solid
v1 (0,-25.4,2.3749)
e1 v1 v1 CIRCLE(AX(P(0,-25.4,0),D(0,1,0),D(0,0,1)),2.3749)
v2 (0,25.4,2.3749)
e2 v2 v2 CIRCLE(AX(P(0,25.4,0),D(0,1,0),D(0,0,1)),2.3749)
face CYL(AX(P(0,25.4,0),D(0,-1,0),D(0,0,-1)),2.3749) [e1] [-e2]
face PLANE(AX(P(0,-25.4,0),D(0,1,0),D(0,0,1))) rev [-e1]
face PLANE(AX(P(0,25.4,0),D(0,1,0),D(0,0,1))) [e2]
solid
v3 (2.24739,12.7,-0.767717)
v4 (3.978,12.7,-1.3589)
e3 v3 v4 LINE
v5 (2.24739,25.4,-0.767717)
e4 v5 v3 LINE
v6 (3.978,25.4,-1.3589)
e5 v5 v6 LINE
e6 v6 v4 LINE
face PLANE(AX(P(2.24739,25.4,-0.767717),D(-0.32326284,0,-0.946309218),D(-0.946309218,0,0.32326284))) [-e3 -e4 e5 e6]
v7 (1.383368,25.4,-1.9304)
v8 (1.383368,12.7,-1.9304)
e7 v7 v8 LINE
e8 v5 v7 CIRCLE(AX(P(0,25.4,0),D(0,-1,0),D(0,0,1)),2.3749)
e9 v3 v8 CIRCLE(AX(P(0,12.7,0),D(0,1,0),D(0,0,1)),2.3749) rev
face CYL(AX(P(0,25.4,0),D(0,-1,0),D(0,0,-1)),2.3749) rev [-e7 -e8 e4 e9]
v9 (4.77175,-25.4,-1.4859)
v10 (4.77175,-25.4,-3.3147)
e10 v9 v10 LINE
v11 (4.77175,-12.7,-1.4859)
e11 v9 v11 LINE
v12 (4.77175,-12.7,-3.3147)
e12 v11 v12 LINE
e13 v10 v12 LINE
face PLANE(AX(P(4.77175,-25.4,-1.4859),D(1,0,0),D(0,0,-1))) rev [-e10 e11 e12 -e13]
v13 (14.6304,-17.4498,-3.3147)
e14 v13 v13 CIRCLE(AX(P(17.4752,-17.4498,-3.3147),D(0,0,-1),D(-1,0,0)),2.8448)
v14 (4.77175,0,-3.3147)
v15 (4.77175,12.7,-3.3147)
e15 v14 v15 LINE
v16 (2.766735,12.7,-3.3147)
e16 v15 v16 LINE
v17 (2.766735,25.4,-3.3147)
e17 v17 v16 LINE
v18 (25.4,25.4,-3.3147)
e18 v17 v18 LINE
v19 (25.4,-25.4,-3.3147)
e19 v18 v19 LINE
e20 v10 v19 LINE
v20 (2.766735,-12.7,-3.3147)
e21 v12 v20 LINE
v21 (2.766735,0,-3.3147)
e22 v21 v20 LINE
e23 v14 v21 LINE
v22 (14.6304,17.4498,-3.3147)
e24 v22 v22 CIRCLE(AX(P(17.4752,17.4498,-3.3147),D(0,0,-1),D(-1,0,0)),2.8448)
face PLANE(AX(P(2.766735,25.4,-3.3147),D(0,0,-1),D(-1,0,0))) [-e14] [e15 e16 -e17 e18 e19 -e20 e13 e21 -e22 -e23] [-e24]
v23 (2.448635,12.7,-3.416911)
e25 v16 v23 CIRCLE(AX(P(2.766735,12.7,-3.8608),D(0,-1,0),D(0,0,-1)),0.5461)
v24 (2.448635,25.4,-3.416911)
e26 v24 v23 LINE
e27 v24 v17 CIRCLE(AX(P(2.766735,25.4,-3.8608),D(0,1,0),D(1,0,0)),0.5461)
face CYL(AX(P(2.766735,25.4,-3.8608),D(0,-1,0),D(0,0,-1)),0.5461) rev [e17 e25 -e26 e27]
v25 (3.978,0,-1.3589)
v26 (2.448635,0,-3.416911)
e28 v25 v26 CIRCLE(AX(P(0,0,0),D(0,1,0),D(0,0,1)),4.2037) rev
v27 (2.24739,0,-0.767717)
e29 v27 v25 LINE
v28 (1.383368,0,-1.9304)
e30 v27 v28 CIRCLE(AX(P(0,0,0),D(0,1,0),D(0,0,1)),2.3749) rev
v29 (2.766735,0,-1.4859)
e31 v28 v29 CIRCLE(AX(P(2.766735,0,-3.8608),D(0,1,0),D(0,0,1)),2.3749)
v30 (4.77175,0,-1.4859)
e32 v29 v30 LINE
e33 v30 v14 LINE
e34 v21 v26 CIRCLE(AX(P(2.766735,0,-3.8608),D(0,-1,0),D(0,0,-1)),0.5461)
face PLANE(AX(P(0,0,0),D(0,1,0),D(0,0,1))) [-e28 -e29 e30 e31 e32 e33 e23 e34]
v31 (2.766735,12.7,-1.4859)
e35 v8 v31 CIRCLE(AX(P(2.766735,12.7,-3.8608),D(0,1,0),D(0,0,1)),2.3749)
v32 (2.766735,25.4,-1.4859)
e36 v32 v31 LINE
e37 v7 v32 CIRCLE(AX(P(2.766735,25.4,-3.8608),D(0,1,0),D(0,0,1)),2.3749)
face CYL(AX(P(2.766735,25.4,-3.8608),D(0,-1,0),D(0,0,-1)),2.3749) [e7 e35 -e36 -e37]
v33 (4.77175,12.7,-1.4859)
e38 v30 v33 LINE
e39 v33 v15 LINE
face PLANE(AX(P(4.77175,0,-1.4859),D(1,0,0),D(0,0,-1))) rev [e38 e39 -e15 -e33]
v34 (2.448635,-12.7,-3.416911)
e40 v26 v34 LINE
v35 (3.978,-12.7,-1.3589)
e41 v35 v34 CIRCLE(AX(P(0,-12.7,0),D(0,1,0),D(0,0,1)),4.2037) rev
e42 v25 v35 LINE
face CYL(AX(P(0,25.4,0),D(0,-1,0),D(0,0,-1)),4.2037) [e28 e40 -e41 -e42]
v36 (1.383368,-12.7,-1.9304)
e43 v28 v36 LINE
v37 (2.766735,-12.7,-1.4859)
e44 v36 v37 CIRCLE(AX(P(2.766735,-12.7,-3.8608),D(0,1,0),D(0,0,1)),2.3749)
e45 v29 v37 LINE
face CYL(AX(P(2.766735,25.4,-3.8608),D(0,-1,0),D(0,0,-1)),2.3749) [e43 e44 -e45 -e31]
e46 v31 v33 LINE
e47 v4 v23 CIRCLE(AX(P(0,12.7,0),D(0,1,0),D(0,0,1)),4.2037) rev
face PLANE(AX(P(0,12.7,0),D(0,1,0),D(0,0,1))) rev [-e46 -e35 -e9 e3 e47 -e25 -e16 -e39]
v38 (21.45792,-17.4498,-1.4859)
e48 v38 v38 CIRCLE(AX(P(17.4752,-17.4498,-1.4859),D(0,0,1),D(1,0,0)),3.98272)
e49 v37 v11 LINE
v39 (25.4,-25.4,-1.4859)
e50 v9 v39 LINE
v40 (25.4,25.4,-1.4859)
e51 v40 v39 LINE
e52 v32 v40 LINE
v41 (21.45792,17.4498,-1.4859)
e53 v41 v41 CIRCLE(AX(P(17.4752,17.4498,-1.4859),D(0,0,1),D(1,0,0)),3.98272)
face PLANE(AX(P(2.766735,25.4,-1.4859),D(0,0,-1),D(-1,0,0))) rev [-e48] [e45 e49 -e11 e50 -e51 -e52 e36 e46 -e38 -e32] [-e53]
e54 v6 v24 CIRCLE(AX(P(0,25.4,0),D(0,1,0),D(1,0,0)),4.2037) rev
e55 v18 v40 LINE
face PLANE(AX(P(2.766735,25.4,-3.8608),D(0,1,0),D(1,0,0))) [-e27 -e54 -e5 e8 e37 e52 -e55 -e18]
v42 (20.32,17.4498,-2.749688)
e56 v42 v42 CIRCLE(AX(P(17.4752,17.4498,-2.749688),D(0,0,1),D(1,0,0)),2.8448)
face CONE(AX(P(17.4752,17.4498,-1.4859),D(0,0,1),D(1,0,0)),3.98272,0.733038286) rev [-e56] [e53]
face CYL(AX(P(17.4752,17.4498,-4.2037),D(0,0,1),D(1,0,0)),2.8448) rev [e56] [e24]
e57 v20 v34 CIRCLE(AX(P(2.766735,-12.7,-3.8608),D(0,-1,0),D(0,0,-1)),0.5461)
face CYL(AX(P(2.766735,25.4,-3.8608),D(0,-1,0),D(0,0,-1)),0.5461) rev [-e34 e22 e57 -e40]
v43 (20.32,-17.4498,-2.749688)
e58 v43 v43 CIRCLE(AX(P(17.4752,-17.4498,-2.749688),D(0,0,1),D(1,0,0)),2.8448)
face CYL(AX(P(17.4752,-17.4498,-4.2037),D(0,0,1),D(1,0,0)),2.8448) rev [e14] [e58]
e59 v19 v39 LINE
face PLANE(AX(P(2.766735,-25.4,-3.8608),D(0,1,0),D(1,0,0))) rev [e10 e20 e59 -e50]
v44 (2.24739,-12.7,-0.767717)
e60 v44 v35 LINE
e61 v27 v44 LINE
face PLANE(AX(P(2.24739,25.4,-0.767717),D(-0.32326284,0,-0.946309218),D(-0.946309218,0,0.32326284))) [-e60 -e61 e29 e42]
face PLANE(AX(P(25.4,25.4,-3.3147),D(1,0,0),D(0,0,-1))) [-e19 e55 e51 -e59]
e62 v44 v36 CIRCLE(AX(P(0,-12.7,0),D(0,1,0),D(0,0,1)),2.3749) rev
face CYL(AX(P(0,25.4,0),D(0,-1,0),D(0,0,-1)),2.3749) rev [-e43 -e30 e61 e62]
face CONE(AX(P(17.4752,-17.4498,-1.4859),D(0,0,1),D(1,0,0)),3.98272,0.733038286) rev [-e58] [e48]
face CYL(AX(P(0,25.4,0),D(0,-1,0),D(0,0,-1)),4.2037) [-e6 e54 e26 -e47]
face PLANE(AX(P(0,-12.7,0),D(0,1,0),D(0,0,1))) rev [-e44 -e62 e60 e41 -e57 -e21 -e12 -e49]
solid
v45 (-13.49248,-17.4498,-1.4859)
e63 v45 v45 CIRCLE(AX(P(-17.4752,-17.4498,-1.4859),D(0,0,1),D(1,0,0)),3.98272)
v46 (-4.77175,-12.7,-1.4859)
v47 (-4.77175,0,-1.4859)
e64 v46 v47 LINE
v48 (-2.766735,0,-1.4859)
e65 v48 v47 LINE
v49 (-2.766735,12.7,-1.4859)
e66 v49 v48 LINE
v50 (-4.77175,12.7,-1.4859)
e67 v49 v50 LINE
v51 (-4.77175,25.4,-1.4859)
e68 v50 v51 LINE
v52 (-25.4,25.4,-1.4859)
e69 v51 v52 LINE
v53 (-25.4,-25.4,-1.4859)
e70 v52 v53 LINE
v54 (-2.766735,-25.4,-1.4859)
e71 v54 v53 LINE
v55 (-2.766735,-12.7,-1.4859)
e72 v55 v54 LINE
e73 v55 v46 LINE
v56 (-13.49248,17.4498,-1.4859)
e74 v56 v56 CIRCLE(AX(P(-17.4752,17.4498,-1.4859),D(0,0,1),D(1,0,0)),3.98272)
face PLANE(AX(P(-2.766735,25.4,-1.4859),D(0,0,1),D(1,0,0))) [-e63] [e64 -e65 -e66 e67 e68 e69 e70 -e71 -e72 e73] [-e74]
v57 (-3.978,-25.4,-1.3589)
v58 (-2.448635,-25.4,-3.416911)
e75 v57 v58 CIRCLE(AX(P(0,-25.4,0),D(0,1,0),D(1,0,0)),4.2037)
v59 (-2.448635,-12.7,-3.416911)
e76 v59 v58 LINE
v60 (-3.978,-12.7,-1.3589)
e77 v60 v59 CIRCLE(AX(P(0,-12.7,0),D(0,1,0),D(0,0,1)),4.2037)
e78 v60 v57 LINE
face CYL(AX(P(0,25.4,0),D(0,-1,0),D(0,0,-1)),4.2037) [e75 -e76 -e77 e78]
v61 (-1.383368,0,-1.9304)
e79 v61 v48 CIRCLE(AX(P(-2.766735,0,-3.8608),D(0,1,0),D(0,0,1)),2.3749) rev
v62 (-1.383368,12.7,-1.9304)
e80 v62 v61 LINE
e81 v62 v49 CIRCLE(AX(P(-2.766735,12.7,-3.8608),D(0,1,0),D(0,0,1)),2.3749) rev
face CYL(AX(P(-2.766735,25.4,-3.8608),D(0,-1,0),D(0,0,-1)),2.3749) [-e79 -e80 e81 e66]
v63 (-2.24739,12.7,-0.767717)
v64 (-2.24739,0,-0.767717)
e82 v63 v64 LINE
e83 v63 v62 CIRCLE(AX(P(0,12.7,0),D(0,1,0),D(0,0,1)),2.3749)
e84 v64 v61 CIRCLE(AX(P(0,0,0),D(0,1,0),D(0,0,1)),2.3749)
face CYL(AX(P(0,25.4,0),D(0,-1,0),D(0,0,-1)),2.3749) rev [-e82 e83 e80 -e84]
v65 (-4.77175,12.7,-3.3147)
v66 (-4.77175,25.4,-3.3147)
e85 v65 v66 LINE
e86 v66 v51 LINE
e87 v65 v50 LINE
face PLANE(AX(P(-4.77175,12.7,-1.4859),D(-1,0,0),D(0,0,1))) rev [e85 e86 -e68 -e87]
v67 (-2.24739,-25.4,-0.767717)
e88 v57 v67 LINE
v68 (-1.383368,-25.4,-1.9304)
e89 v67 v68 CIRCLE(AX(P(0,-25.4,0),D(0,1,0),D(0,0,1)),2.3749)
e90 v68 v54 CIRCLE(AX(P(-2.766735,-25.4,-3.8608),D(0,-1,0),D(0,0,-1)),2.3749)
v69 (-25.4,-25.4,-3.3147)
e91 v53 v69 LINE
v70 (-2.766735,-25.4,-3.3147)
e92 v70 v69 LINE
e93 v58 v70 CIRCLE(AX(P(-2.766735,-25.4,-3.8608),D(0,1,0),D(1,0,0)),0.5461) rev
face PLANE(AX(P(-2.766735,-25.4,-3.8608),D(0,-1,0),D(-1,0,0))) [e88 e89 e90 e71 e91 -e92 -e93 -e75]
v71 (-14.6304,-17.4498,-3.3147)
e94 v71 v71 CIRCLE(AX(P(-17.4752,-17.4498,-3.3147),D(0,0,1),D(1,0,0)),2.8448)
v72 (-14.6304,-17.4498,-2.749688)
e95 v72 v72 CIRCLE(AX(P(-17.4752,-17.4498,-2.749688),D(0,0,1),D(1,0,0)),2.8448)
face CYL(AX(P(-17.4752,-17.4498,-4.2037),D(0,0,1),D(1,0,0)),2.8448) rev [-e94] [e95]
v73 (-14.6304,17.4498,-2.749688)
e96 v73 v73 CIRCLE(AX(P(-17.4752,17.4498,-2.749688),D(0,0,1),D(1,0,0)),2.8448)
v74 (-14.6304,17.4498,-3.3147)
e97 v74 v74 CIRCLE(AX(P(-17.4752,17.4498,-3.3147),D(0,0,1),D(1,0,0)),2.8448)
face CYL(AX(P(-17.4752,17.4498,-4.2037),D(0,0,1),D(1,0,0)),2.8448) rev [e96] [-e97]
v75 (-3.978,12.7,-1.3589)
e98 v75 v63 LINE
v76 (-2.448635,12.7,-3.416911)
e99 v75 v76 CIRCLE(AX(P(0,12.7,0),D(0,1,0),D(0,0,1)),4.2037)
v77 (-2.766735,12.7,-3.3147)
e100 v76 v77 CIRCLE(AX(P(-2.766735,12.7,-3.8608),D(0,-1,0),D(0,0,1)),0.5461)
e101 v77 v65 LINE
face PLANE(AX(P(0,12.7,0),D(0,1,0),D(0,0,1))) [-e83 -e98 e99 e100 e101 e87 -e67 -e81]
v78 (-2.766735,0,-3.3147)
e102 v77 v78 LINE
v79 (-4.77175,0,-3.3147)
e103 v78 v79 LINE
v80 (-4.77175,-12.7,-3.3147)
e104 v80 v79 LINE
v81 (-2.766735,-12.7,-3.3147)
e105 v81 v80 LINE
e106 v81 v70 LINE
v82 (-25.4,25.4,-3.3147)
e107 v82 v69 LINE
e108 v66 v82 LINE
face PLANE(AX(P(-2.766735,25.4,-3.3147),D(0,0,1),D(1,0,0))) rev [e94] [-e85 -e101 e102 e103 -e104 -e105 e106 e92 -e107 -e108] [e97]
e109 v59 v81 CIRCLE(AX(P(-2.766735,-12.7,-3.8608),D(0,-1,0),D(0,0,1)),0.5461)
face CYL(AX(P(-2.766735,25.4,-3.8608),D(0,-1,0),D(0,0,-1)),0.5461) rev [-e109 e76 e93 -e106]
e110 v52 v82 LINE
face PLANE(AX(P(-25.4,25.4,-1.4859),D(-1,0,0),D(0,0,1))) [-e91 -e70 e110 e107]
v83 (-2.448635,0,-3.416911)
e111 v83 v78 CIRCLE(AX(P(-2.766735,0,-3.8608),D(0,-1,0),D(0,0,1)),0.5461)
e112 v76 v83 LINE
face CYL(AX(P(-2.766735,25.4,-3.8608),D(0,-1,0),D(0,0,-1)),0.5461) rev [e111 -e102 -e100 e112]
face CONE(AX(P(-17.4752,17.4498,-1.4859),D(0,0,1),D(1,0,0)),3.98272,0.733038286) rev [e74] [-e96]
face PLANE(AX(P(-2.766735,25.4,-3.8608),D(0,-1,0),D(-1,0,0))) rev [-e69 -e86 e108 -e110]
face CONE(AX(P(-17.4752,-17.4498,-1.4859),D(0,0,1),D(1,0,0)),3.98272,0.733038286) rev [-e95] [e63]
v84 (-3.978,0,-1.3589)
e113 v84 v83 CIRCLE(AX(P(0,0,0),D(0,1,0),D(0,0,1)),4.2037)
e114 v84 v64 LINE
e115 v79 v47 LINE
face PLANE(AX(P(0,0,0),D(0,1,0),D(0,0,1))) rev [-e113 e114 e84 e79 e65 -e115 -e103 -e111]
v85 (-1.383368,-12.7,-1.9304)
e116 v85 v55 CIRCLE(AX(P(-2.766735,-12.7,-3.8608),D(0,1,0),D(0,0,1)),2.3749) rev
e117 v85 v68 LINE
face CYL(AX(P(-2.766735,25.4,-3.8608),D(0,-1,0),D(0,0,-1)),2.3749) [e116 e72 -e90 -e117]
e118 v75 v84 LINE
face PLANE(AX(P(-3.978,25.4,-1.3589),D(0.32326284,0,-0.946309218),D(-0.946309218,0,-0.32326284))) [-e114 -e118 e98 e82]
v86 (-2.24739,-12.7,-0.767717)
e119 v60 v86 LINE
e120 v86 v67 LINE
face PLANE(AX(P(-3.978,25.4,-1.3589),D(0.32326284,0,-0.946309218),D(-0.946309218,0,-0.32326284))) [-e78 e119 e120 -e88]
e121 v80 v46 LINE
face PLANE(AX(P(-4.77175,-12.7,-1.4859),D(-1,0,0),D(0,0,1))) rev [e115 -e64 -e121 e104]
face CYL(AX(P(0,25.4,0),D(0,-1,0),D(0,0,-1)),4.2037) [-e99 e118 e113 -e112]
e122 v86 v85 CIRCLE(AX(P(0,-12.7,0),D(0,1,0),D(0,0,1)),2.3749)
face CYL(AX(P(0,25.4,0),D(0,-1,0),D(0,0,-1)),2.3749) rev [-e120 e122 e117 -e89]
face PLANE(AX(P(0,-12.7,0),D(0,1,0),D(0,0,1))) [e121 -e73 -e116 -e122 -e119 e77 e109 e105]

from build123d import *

# Parameters (mm, degrees)
EXTRUDE_THIN1_DEPTH      = 25.4
EXTRUDE_THIN1_DEPTH_BACK = 25.4
EXTRUDE_THIN2_DEPTH      = 25.4
EXTRUDE_THIN2_DEPTH_BACK = 25.4
CUT_EXTRUDE1_START       = -12.7
CUT_EXTRUDE1_DEPTH       = 12.7
LPATTERN1_COUNT          = 2
LPATTERN1_PITCH          = 25.4
CUT_EXTRUDE2_START       = -25.4
CUT_EXTRUDE2_DEPTH       = 12.7
LPATTERN2_COUNT          = 2
LPATTERN2_PITCH          = 25.4
CUT_EXTRUDE3_DEPTH       = 37.16615951
CUT_EXTRUDE3_DEPTH_BACK  = 37.16615951
SKETCH6_R                = 2.8448
BOSS_EXTRUDE1_DEPTH      = 25.4
BOSS_EXTRUDE1_DEPTH_BACK = 25.4
SKETCH7_R                = 2.3749


# Read off the part's stored shape, not the designer's step: Cut-Extrude1
with BuildPart() as part:
    # Sketch3 → Extrude-Thin1 (new, two sides: drawn at the far end of the back side and taken through both)
    with BuildSketch(Plane(origin=(0, 0, 0), x_dir=(1, 0, 0), z_dir=(0, 1, 0)).offset(-EXTRUDE_THIN1_DEPTH_BACK)):
        with BuildLine():
            ThreePointArc((-2.247389762, 0.767716918), (-1.931760974, -1.381466449), (0, -2.3749))
            ThreePointArc((0, -2.3749), (2.3749, 0), (0, 2.3749))
            ThreePointArc((0, 2.3749), (-0.726513266, 2.261045883), (-1.383367576, 1.9304))
            ThreePointArc((-1.383367576, 1.9304), (-2.040221886, 1.599754117), (-2.766735152, 1.4859))
            Line((-2.766735152, 1.4859), (-25.4, 1.4859))
            Line((-25.4, 1.4859), (-25.4, 3.3147))
            Line((-25.4, 3.3147), (-2.766735152, 3.3147))
            ThreePointArc((-2.766735152, 3.3147), (-2.599675952, 3.340880358), (-2.448634586, 3.41691123))
            ThreePointArc((-2.448634586, 3.41691123), (-1.285967331, 4.002172124), (0, 4.2037))
            ThreePointArc((0, 4.2037), (4.2037, 0), (0, -4.2037))
            ThreePointArc((0, -4.2037), (-3.419320226, -2.44526949), (-3.97800006, 1.3589))
            Line((-3.97800006, 1.3589), (-2.247389762, 0.767716918))
        make_face()
    extrude(amount=EXTRUDE_THIN1_DEPTH + EXTRUDE_THIN1_DEPTH_BACK)

    # Cut-Extrude1 outline → Cut-Extrude1 (cut)
    with BuildSketch(Plane(origin=(0, 25.4, 0), x_dir=(1, 0, 0), z_dir=(0, 1, 0)).offset(CUT_EXTRUDE1_START)):
        with BuildLine():
            Line((-2.766735152, 3.3147), (-4.77175006, 3.3147))
            Line((-4.77175006, 3.3147), (-4.77175006, 1.4859))
            Line((-4.77175006, 1.4859), (-2.766735152, 1.4859))
            ThreePointArc((-2.766735152, 1.4859), (-2.040221886, 1.599754117), (-1.383367576, 1.9304))
            ThreePointArc((-1.383367576, 1.9304), (1.906189315, -1.416542378), (-2.247389762, 0.767716918))
            Line((-2.247389762, 0.767716918), (-3.97800006, 1.3589))
            ThreePointArc((-3.97800006, 1.3589), (3.37405702, -2.507355761), (-2.448634586, 3.41691123))
            ThreePointArc((-2.448634586, 3.41691123), (-2.599675952, 3.340880358), (-2.766735152, 3.3147))
        make_face()
    cut_extrude1 = extrude(amount=CUT_EXTRUDE1_DEPTH, mode=Mode.SUBTRACT)

    # LPattern1: Cut-Extrude1 ×2
    with Locations(*[(0, -i * LPATTERN1_PITCH, 0) for i in range(1, LPATTERN1_COUNT)]):
        add(cut_extrude1, mode=Mode.SUBTRACT)


with BuildPart() as body_2:
    # Sketch4 → Extrude-Thin2 (new, two sides: drawn at the far end of the back side and taken through both)
    with BuildSketch(Plane(origin=(0, 0, 0), x_dir=(1, 0, 0), z_dir=(0, 1, 0)).offset(-EXTRUDE_THIN2_DEPTH_BACK)):
        with BuildLine():
            ThreePointArc((2.247389762, 0.767716918), (1.931760974, -1.381466449), (0, -2.3749))
            ThreePointArc((0, -2.3749), (-2.3749, 0), (0, 2.3749))
            ThreePointArc((0, 2.3749), (0.726513266, 2.261045883), (1.383367576, 1.9304))
            ThreePointArc((1.383367576, 1.9304), (2.040221886, 1.599754117), (2.766735152, 1.4859))
            Line((2.766735152, 1.4859), (25.4, 1.4859))
            Line((25.4, 1.4859), (25.4, 3.3147))
            Line((25.4, 3.3147), (2.766735152, 3.3147))
            ThreePointArc((2.766735152, 3.3147), (2.599675952, 3.340880358), (2.448634586, 3.41691123))
            ThreePointArc((2.448634586, 3.41691123), (1.285967331, 4.002172124), (0, 4.2037))
            ThreePointArc((0, 4.2037), (-4.2037, 0), (0, -4.2037))
            ThreePointArc((0, -4.2037), (3.419320226, -2.44526949), (3.97800006, 1.3589))
            Line((3.97800006, 1.3589), (2.247389762, 0.767716918))
        make_face()
    extrude(amount=EXTRUDE_THIN2_DEPTH + EXTRUDE_THIN2_DEPTH_BACK)

    # Sketch5<2> → Cut-Extrude2 (cut)
    with BuildSketch(Plane(origin=(0, 25.4, 0), x_dir=(1, 0, 0), z_dir=(0, 1, 0)).offset(CUT_EXTRUDE2_START)):
        with BuildLine():
            Line((-3.97800006, 3.3147), (-2.766735152, 3.3147))
            ThreePointArc((-2.766735152, 3.3147), (-2.599675952, 3.340880358), (-2.448634586, 3.41691123))
            ThreePointArc((-2.448634586, 3.41691123), (0, 4.2037), (2.448634586, 3.41691123))
            ThreePointArc((2.448634586, 3.41691123), (2.599675952, 3.340880358), (2.766735152, 3.3147))
            Line((2.766735152, 3.3147), (3.97800006, 3.3147))
            Line((3.97800006, 3.3147), (4.77175006, 3.3147))
            Line((4.77175006, 3.3147), (4.77175006, 1.4859))
            Line((4.77175006, 1.4859), (3.97800006, 1.4859))
            Line((3.97800006, 1.4859), (3.97800006, 1.3589))
            ThreePointArc((3.97800006, 1.3589), (0, -4.2037), (-3.97800006, 1.3589))
            Line((-3.97800006, 1.3589), (-3.97800006, 1.4859))
            Line((-3.97800006, 1.4859), (-4.77175006, 1.4859))
            Line((-4.77175006, 1.4859), (-4.77175006, 3.3147))
            Line((-4.77175006, 3.3147), (-3.97800006, 3.3147))
        make_face()
    cut_extrude2 = extrude(amount=CUT_EXTRUDE2_DEPTH, mode=Mode.SUBTRACT)

    # LPattern2: Cut-Extrude2 ×2
    with Locations(*[(0, -i * LPATTERN2_PITCH, 0) for i in range(1, LPATTERN2_COUNT)]):
        add(cut_extrude2, mode=Mode.SUBTRACT)


with BuildPart() as cut_extrude3_tool:
    # Sketch6 → Cut-Extrude3 (new, two sides: drawn at the far end of the back side and taken through both)
    with BuildSketch(Plane.XY.offset(-CUT_EXTRUDE3_DEPTH_BACK)):
        with Locations((-17.4752, 17.4498)):
            Circle(SKETCH6_R)
        with Locations((-17.4752, -17.4498)):
            Circle(SKETCH6_R)
        with Locations(Location((17.4752, -17.4498, 0), (0, 0, 180))):
            Circle(SKETCH6_R)
        with Locations(Location((17.4752, 17.4498, 0), (0, 0, 180))):
            Circle(SKETCH6_R)
    extrude(amount=CUT_EXTRUDE3_DEPTH + CUT_EXTRUDE3_DEPTH_BACK)


with BuildPart() as part_1:
    add(part.part)

    # Cut-Extrude3: cut by cut_extrude3_tool
    add(cut_extrude3_tool.part, mode=Mode.SUBTRACT)

    # Cut-Extrude4 cone 3 section (through the dimple's axis) → Cut-Extrude4 cone 3 (revolve, cut)
    with BuildSketch(Plane(origin=(-17.4752, -17.4498, -1.4859), x_dir=(0, -1, 0), z_dir=(1, 0, 0))):
        Polygon((0, 0), (3.98272, 0), (0, 4.423258675), align=None)
    revolve(axis=Axis((-17.4752, -17.4498, -1.4859), (0, 0, -1)), mode=Mode.SUBTRACT)

    # Cut-Extrude4 cone 4 section (through the dimple's axis) → Cut-Extrude4 cone 4 (revolve, cut)
    with BuildSketch(Plane(origin=(-17.4752, 17.4498, -1.4859), x_dir=(0, -1, 0), z_dir=(1, 0, 0))):
        Polygon((0, 0), (3.98272, 0), (0, 4.423258675), align=None)
    revolve(axis=Axis((-17.4752, 17.4498, -1.4859), (0, 0, -1)), mode=Mode.SUBTRACT)


with BuildPart() as body_2_1:
    add(body_2.part)

    # Cut-Extrude3: cut by cut_extrude3_tool
    add(cut_extrude3_tool.part, mode=Mode.SUBTRACT)

    # Cut-Extrude4 cone 1 section (through the dimple's axis) → Cut-Extrude4 (revolve, cut)
    with BuildSketch(Plane(origin=(17.4752, 17.4498, -1.4859), x_dir=(0, -1, 0), z_dir=(1, 0, 0))):
        Polygon((0, 0), (3.98272, 0), (0, 4.423258675), align=None)
    revolve(axis=Axis((17.4752, 17.4498, -1.4859), (0, 0, -1)), mode=Mode.SUBTRACT)

    # Cut-Extrude4 cone 2 section (through the dimple's axis) → Cut-Extrude4 cone 2 (revolve, cut)
    with BuildSketch(Plane(origin=(17.4752, -17.4498, -1.4859), x_dir=(0, -1, 0), z_dir=(1, 0, 0))):
        Polygon((0, 0), (3.98272, 0), (0, 4.423258675), align=None)
    revolve(axis=Axis((17.4752, -17.4498, -1.4859), (0, 0, -1)), mode=Mode.SUBTRACT)


with BuildPart() as body_3:
    # Sketch7 → Boss-Extrude1 (new, two sides: drawn at the far end of the back side and taken through both)
    with BuildSketch(Plane(origin=(0, 0, 0), x_dir=(1, 0, 0), z_dir=(0, 1, 0)).offset(-BOSS_EXTRUDE1_DEPTH_BACK)):
        with Locations(Location((0, 0, 0), (0, 0, 270))):
            Circle(SKETCH7_R)
    extrude(amount=BOSS_EXTRUDE1_DEPTH + BOSS_EXTRUDE1_DEPTH_BACK)


solid = Compound([part_1.part, body_2_1.part, body_3.part])
